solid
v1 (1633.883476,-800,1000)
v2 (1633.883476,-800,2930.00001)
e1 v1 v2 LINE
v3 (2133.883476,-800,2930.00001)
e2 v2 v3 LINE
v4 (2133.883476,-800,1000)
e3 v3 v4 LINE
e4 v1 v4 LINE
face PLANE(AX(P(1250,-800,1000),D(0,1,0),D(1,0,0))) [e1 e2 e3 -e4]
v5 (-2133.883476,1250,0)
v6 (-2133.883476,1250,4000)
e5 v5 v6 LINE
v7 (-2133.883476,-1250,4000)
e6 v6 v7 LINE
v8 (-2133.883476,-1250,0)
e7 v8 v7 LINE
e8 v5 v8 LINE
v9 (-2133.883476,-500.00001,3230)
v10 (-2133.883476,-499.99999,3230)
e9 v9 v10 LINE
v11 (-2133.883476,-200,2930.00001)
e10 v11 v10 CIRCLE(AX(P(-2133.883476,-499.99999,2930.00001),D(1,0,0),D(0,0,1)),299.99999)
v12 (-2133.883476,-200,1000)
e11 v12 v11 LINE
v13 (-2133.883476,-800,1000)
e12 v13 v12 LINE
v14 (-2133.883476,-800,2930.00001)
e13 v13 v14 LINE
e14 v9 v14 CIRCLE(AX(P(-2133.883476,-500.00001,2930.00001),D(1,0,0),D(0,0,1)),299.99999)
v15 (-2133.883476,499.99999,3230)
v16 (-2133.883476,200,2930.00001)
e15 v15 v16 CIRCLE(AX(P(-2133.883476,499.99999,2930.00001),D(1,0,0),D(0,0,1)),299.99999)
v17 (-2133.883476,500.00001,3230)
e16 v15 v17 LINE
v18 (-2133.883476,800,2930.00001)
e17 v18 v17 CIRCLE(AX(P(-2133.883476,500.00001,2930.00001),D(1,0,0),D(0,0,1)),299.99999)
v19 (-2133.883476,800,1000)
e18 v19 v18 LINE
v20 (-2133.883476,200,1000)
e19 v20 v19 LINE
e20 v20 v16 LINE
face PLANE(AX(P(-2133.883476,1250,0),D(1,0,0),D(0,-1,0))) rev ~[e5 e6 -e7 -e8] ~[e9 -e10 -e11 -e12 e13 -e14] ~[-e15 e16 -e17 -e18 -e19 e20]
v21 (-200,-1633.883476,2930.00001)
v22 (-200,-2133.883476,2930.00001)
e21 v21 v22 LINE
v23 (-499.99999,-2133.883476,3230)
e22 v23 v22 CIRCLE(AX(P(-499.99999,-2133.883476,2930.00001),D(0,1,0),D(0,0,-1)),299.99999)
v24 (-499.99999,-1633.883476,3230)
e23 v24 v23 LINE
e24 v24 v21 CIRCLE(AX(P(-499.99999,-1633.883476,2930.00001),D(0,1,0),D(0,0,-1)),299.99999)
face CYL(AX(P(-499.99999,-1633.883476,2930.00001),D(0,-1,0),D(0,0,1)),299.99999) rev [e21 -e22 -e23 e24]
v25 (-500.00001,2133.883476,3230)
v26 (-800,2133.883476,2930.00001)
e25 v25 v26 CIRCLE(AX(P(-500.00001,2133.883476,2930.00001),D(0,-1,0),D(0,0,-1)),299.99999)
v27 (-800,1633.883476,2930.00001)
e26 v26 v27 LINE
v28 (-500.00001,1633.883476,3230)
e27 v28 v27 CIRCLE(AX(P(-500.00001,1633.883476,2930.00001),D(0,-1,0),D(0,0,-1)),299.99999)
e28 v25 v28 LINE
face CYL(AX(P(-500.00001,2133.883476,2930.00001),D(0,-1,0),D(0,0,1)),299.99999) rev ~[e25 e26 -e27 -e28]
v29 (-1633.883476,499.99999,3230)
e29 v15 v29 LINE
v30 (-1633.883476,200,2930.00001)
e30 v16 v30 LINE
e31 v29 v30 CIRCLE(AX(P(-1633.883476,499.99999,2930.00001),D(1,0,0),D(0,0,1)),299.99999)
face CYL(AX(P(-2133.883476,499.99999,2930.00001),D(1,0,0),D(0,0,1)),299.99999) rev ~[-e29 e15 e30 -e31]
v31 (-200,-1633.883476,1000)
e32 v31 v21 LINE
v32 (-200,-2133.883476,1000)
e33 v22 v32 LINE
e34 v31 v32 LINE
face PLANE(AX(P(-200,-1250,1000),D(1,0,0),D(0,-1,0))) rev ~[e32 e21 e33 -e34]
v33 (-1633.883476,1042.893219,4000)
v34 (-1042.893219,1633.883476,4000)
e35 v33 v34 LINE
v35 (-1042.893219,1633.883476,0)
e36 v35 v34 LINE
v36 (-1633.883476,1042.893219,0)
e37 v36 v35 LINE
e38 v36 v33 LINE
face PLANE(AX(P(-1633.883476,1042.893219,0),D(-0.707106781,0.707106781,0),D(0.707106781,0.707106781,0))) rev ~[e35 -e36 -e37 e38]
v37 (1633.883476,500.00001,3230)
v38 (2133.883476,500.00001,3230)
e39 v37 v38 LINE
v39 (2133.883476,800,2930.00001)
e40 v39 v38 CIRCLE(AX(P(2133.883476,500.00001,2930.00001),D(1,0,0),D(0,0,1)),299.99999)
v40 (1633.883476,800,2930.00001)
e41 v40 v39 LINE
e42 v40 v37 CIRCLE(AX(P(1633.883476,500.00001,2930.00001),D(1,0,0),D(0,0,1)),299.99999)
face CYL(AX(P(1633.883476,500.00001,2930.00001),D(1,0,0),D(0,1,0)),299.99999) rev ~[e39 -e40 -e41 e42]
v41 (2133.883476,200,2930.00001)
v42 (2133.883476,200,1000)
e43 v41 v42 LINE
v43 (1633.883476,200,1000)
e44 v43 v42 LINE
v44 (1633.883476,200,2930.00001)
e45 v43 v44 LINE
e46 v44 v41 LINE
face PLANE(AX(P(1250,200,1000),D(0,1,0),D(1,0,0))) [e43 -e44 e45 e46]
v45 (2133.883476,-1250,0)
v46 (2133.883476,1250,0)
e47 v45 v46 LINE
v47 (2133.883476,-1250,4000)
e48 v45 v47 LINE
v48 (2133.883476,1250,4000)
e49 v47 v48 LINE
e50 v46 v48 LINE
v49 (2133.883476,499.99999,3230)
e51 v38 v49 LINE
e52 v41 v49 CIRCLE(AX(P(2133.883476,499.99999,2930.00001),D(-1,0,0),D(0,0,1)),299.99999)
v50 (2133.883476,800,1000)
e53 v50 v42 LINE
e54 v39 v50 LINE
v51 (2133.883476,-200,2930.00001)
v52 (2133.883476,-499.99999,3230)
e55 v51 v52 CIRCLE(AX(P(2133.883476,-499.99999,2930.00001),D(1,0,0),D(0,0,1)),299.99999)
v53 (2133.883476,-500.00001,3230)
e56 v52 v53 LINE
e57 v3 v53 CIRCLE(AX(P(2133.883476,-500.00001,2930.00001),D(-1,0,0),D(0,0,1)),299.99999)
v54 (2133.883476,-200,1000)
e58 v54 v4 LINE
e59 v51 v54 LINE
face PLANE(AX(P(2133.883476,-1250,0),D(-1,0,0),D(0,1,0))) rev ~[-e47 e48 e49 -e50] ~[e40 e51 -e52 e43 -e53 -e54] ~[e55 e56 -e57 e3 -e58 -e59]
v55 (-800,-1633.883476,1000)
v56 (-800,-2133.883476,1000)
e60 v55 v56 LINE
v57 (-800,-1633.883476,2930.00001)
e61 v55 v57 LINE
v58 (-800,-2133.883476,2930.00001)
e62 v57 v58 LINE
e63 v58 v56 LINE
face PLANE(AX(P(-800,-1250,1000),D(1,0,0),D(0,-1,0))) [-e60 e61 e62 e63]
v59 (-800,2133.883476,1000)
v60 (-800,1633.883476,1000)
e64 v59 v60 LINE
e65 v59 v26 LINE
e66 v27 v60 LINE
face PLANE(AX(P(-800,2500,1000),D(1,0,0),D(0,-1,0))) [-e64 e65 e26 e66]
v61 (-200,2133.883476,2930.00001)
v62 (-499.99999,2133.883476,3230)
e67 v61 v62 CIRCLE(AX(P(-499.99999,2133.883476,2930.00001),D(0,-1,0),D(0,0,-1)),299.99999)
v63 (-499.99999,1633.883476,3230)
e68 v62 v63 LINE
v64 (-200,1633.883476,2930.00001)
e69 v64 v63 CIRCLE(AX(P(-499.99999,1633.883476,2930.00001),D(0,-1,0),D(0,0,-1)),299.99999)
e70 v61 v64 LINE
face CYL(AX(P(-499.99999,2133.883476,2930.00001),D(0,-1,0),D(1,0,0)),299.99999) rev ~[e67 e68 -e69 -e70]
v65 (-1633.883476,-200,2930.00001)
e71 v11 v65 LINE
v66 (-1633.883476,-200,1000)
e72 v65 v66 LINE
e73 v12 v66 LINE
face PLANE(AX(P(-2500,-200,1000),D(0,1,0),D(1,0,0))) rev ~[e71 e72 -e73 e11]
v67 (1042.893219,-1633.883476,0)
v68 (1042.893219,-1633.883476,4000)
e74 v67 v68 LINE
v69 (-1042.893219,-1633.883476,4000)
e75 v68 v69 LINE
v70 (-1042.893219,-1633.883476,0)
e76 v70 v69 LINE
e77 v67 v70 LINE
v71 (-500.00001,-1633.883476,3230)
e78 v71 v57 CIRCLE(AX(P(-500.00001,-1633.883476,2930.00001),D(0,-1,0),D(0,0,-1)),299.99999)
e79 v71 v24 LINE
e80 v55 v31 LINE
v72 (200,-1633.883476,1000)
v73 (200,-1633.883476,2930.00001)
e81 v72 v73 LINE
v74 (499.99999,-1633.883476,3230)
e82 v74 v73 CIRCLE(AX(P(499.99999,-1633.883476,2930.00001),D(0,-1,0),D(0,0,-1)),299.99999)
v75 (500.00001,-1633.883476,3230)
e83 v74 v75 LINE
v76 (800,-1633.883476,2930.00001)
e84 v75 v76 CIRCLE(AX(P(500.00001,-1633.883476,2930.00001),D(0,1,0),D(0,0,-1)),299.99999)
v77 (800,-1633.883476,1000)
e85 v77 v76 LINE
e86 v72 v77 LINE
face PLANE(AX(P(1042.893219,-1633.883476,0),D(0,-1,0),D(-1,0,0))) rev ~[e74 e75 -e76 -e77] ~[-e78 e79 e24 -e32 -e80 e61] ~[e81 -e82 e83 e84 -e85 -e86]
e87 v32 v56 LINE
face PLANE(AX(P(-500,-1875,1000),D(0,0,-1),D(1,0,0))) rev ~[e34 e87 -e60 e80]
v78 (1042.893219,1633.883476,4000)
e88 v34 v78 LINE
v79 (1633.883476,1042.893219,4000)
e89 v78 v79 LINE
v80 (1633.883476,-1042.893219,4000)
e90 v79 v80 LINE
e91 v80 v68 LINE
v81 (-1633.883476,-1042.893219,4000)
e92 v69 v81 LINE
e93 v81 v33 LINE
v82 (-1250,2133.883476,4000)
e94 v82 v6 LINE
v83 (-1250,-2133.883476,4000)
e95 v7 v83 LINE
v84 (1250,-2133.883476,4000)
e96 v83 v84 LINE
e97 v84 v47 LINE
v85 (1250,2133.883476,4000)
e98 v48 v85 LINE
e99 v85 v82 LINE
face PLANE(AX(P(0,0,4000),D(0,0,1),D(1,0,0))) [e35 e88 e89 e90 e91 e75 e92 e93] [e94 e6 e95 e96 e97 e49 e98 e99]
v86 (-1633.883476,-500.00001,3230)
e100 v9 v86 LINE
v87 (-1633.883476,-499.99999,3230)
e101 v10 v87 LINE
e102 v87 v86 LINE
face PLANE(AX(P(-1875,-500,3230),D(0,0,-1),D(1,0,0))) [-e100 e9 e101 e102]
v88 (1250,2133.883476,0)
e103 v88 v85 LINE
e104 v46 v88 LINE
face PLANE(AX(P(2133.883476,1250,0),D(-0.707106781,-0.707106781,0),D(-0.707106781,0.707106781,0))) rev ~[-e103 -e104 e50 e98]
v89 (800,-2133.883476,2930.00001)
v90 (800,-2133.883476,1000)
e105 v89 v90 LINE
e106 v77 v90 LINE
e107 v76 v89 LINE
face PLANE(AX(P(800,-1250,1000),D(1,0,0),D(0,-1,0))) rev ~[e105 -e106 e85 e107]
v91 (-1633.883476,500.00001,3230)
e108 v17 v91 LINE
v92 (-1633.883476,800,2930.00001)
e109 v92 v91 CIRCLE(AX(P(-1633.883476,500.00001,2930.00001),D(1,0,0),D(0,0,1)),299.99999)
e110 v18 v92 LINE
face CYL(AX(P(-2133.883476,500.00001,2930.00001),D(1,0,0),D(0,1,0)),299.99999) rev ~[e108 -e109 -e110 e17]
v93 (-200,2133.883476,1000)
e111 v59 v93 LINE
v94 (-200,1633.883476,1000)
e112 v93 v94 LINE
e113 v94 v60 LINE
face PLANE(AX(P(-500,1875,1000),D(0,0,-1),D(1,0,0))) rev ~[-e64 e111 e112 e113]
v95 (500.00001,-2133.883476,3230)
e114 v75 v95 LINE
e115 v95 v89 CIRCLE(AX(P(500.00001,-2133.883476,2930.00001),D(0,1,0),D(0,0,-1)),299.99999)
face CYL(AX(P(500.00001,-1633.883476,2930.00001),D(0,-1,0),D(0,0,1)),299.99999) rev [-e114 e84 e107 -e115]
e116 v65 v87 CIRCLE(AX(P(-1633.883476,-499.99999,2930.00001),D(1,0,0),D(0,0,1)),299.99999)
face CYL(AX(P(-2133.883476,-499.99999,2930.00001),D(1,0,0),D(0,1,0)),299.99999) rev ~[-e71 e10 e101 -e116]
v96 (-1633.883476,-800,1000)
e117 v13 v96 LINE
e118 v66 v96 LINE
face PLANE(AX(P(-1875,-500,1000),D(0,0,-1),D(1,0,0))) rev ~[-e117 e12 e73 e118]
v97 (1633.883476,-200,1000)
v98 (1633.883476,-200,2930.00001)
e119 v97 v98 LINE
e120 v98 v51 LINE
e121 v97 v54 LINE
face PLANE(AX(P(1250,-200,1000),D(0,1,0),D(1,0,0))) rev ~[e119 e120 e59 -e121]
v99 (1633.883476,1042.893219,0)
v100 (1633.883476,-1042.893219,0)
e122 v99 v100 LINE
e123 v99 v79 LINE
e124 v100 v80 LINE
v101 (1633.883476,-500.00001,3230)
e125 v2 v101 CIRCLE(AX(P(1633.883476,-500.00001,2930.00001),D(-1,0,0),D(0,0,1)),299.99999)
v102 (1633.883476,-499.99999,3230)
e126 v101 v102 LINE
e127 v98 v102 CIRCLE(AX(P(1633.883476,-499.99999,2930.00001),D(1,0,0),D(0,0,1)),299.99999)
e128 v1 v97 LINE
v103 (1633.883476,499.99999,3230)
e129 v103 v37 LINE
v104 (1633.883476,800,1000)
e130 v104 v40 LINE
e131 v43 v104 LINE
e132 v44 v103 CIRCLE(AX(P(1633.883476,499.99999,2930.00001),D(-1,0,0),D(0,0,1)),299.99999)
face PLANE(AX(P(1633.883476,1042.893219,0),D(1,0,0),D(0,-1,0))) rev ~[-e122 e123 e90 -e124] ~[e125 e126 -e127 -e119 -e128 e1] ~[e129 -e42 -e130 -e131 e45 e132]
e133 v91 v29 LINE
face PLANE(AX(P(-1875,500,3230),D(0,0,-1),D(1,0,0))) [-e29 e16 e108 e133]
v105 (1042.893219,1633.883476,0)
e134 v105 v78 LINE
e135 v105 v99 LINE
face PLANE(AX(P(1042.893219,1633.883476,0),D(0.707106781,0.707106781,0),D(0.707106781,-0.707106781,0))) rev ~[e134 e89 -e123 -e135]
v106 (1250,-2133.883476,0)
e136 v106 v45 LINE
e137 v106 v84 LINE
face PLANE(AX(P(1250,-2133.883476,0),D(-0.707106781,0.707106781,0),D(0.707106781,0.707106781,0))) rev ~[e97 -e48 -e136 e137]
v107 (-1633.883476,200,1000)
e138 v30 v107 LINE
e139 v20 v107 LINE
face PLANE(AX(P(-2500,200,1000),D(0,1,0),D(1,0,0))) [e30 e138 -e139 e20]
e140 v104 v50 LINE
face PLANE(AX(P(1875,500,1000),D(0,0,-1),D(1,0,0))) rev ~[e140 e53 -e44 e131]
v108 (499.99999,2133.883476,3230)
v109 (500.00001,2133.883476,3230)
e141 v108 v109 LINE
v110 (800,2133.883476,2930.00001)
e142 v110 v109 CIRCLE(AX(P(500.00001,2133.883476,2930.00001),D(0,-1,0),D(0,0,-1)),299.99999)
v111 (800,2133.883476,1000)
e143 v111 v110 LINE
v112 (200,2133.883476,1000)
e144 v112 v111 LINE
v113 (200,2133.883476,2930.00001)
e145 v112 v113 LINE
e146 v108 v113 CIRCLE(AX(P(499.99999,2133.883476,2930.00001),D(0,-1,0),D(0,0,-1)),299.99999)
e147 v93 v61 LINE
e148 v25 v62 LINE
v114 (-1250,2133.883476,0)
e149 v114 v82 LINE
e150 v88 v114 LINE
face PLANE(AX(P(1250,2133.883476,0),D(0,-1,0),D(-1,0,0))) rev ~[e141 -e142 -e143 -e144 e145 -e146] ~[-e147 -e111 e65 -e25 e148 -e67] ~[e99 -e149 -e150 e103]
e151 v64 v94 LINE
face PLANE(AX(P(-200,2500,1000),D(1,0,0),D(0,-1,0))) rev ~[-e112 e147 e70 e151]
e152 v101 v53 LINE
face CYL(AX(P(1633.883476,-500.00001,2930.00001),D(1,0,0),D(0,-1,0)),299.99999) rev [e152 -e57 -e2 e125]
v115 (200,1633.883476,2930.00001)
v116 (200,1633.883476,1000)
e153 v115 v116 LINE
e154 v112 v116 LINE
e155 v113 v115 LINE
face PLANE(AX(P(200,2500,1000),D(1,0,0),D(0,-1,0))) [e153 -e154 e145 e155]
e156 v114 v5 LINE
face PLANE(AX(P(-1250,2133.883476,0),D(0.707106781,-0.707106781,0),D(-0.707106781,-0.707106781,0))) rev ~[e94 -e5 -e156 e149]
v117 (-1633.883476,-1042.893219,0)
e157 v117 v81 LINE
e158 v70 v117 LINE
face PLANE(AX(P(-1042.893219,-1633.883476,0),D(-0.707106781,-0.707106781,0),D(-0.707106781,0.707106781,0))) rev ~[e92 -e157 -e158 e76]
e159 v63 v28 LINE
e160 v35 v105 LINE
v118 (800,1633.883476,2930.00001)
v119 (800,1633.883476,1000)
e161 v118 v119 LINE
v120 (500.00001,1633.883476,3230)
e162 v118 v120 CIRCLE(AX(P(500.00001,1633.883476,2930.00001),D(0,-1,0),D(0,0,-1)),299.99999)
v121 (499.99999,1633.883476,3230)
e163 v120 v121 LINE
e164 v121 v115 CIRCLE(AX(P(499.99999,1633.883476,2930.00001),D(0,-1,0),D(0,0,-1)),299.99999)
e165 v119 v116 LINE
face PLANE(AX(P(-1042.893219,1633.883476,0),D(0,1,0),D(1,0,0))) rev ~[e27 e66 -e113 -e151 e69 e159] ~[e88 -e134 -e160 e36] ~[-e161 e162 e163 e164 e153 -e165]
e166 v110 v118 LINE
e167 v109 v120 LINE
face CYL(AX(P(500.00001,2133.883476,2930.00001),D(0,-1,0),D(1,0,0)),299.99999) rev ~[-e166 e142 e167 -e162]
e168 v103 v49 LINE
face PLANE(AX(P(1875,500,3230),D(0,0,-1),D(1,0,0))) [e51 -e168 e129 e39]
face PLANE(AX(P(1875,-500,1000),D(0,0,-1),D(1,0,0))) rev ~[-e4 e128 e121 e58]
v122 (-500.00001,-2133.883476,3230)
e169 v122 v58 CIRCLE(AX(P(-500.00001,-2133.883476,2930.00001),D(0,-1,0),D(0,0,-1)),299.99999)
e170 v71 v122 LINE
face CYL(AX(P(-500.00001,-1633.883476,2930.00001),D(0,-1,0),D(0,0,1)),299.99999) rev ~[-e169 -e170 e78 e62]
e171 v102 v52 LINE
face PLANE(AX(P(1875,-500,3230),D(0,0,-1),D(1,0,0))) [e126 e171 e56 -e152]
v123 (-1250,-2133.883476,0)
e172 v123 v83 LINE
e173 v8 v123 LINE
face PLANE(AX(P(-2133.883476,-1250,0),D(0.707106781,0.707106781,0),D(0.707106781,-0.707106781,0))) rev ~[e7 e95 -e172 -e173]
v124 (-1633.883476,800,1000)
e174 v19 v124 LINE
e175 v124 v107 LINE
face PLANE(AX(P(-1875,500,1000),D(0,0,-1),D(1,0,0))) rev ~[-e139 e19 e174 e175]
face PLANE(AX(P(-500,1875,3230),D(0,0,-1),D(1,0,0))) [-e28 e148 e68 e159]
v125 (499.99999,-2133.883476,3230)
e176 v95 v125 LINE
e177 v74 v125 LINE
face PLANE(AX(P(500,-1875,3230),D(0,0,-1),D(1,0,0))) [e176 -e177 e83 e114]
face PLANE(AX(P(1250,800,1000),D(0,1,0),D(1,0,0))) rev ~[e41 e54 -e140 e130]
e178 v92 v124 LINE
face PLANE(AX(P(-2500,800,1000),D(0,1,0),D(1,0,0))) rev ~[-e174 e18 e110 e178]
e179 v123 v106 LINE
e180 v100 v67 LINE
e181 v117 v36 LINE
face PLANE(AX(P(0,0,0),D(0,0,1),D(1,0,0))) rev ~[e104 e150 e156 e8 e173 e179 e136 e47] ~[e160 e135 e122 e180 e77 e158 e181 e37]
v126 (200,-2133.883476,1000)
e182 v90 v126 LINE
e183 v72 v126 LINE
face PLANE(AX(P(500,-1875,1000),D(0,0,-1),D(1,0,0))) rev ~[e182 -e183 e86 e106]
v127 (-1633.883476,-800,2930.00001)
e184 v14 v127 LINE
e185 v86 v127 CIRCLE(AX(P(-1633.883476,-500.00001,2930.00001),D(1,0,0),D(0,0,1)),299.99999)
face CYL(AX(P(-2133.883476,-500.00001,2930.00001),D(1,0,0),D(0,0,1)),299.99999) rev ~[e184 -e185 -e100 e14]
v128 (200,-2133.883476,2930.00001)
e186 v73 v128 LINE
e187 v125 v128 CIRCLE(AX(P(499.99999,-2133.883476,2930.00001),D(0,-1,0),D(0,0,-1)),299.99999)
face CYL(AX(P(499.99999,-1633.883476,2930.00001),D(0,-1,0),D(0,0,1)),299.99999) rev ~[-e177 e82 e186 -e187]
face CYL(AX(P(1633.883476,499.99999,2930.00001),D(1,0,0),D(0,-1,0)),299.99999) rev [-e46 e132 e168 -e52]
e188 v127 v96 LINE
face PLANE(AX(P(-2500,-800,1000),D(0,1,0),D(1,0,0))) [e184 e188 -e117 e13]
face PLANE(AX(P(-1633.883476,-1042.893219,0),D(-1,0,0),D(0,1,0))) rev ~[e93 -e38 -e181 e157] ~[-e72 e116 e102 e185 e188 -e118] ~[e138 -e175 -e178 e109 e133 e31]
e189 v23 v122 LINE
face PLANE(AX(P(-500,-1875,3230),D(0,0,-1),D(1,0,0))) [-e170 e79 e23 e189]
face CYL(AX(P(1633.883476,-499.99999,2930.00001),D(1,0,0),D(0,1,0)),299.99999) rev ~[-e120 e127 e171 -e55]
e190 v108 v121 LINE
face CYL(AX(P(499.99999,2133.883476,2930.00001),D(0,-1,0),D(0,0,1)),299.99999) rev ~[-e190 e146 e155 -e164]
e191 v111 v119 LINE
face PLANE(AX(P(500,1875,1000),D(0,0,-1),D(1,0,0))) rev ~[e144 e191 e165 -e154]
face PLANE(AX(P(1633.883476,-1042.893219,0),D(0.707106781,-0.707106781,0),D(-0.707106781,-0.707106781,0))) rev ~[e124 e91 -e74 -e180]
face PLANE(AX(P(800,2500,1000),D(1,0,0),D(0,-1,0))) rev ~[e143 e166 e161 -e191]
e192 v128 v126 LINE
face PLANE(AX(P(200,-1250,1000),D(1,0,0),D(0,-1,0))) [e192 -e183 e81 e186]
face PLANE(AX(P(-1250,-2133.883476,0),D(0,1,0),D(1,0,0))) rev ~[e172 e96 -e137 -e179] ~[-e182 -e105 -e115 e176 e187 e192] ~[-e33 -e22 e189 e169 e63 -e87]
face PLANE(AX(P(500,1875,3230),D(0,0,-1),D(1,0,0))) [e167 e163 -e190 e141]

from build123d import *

# Parameters (mm, degrees)
F1_DEPTH = 4000
F3_W     = 600
F3_H     = 1250
F3_W_2   = 1250
F3_H_2   = 600
F4_DEPTH = 2230
F5_R     = 299.99999


# Not quite as in the source:
# - a fillet or chamfer is up to 0.001 mm smaller than in the source, because OpenCascade refuses the exact size


with BuildPart() as f1:
    # F0 (on Top) → F1 (new body)
    with BuildSketch(Plane.XY):
        Polygon((1250, 2133.8834764832), (-1250, 2133.8834764832), (-2133.8834764832, 1250), (-2133.8834764832, -1250), (-1250, -2133.8834764832), (1250, -2133.8834764832), (2133.8834764832, -1250), (2133.8834764832, 1250), align=None)
        Polygon((1633.8834764832, -1042.8932188135), (1042.8932188135, -1633.8834764832), (-1042.8932188135, -1633.8834764832), (-1633.8834764832, -1042.8932188135), (-1633.8834764832, 1042.8932188135), (-1042.8932188135, 1633.8834764832), (1042.8932188135, 1633.8834764832), (1633.8834764832, 1042.8932188135), align=None, mode=Mode.SUBTRACT)
    extrude(amount=F1_DEPTH)

    # F3 (on offset) → F4 (cut)
    with BuildSketch(Plane(origin=(0, 0, 1000), x_dir=(1, 0, 0), z_dir=(0, 0, -1))):
        with Locations((-500, -1875)):
            Rectangle(F3_W, F3_H)
        with Locations((500, -1875)):
            Rectangle(F3_W, F3_H)
        with Locations((-1875, 500)):
            Rectangle(F3_W_2, F3_H_2)
        with Locations((-1875, -500)):
            Rectangle(F3_W_2, F3_H_2)
        with Locations((500, 1875)):
            Rectangle(F3_W, F3_H)
        with Locations((-500, 1875)):
            Rectangle(F3_W, F3_H)
        with Locations((1875, -500)):
            Rectangle(F3_W_2, F3_H_2)
        with Locations((1875, 500)):
            Rectangle(F3_W_2, F3_H_2)
    extrude(amount=-F4_DEPTH, mode=Mode.SUBTRACT)

    # F5 (radius 300 in the source; OpenCascade refuses exactly that, so slightly less here)
    f5_edges = [f1.edges().sort_by_distance(p)[0] for p in [
        (-1883.883476, -800, 3230),
        (-1883.883476, -200, 3230),
        (-1883.883476, 800, 3230),
        (-1883.883476, 200, 3230),
        (-200, 1883.883476, 3230),
        (800, 1883.883476, 3230),
        (-800, 1883.883476, 3230),
        (200, 1883.883476, 3230),
        (1883.883476, 200, 3230),
        (1883.883476, -800, 3230),
        (1883.883476, 800, 3230),
        (1883.883476, -200, 3230),
        (200, -1883.883476, 3230),
        (-800, -1883.883476, 3230),
        (800, -1883.883476, 3230),
        (-200, -1883.883476, 3230),
    ]]
    fillet(f5_edges, radius=F5_R)


solid = f1.part
